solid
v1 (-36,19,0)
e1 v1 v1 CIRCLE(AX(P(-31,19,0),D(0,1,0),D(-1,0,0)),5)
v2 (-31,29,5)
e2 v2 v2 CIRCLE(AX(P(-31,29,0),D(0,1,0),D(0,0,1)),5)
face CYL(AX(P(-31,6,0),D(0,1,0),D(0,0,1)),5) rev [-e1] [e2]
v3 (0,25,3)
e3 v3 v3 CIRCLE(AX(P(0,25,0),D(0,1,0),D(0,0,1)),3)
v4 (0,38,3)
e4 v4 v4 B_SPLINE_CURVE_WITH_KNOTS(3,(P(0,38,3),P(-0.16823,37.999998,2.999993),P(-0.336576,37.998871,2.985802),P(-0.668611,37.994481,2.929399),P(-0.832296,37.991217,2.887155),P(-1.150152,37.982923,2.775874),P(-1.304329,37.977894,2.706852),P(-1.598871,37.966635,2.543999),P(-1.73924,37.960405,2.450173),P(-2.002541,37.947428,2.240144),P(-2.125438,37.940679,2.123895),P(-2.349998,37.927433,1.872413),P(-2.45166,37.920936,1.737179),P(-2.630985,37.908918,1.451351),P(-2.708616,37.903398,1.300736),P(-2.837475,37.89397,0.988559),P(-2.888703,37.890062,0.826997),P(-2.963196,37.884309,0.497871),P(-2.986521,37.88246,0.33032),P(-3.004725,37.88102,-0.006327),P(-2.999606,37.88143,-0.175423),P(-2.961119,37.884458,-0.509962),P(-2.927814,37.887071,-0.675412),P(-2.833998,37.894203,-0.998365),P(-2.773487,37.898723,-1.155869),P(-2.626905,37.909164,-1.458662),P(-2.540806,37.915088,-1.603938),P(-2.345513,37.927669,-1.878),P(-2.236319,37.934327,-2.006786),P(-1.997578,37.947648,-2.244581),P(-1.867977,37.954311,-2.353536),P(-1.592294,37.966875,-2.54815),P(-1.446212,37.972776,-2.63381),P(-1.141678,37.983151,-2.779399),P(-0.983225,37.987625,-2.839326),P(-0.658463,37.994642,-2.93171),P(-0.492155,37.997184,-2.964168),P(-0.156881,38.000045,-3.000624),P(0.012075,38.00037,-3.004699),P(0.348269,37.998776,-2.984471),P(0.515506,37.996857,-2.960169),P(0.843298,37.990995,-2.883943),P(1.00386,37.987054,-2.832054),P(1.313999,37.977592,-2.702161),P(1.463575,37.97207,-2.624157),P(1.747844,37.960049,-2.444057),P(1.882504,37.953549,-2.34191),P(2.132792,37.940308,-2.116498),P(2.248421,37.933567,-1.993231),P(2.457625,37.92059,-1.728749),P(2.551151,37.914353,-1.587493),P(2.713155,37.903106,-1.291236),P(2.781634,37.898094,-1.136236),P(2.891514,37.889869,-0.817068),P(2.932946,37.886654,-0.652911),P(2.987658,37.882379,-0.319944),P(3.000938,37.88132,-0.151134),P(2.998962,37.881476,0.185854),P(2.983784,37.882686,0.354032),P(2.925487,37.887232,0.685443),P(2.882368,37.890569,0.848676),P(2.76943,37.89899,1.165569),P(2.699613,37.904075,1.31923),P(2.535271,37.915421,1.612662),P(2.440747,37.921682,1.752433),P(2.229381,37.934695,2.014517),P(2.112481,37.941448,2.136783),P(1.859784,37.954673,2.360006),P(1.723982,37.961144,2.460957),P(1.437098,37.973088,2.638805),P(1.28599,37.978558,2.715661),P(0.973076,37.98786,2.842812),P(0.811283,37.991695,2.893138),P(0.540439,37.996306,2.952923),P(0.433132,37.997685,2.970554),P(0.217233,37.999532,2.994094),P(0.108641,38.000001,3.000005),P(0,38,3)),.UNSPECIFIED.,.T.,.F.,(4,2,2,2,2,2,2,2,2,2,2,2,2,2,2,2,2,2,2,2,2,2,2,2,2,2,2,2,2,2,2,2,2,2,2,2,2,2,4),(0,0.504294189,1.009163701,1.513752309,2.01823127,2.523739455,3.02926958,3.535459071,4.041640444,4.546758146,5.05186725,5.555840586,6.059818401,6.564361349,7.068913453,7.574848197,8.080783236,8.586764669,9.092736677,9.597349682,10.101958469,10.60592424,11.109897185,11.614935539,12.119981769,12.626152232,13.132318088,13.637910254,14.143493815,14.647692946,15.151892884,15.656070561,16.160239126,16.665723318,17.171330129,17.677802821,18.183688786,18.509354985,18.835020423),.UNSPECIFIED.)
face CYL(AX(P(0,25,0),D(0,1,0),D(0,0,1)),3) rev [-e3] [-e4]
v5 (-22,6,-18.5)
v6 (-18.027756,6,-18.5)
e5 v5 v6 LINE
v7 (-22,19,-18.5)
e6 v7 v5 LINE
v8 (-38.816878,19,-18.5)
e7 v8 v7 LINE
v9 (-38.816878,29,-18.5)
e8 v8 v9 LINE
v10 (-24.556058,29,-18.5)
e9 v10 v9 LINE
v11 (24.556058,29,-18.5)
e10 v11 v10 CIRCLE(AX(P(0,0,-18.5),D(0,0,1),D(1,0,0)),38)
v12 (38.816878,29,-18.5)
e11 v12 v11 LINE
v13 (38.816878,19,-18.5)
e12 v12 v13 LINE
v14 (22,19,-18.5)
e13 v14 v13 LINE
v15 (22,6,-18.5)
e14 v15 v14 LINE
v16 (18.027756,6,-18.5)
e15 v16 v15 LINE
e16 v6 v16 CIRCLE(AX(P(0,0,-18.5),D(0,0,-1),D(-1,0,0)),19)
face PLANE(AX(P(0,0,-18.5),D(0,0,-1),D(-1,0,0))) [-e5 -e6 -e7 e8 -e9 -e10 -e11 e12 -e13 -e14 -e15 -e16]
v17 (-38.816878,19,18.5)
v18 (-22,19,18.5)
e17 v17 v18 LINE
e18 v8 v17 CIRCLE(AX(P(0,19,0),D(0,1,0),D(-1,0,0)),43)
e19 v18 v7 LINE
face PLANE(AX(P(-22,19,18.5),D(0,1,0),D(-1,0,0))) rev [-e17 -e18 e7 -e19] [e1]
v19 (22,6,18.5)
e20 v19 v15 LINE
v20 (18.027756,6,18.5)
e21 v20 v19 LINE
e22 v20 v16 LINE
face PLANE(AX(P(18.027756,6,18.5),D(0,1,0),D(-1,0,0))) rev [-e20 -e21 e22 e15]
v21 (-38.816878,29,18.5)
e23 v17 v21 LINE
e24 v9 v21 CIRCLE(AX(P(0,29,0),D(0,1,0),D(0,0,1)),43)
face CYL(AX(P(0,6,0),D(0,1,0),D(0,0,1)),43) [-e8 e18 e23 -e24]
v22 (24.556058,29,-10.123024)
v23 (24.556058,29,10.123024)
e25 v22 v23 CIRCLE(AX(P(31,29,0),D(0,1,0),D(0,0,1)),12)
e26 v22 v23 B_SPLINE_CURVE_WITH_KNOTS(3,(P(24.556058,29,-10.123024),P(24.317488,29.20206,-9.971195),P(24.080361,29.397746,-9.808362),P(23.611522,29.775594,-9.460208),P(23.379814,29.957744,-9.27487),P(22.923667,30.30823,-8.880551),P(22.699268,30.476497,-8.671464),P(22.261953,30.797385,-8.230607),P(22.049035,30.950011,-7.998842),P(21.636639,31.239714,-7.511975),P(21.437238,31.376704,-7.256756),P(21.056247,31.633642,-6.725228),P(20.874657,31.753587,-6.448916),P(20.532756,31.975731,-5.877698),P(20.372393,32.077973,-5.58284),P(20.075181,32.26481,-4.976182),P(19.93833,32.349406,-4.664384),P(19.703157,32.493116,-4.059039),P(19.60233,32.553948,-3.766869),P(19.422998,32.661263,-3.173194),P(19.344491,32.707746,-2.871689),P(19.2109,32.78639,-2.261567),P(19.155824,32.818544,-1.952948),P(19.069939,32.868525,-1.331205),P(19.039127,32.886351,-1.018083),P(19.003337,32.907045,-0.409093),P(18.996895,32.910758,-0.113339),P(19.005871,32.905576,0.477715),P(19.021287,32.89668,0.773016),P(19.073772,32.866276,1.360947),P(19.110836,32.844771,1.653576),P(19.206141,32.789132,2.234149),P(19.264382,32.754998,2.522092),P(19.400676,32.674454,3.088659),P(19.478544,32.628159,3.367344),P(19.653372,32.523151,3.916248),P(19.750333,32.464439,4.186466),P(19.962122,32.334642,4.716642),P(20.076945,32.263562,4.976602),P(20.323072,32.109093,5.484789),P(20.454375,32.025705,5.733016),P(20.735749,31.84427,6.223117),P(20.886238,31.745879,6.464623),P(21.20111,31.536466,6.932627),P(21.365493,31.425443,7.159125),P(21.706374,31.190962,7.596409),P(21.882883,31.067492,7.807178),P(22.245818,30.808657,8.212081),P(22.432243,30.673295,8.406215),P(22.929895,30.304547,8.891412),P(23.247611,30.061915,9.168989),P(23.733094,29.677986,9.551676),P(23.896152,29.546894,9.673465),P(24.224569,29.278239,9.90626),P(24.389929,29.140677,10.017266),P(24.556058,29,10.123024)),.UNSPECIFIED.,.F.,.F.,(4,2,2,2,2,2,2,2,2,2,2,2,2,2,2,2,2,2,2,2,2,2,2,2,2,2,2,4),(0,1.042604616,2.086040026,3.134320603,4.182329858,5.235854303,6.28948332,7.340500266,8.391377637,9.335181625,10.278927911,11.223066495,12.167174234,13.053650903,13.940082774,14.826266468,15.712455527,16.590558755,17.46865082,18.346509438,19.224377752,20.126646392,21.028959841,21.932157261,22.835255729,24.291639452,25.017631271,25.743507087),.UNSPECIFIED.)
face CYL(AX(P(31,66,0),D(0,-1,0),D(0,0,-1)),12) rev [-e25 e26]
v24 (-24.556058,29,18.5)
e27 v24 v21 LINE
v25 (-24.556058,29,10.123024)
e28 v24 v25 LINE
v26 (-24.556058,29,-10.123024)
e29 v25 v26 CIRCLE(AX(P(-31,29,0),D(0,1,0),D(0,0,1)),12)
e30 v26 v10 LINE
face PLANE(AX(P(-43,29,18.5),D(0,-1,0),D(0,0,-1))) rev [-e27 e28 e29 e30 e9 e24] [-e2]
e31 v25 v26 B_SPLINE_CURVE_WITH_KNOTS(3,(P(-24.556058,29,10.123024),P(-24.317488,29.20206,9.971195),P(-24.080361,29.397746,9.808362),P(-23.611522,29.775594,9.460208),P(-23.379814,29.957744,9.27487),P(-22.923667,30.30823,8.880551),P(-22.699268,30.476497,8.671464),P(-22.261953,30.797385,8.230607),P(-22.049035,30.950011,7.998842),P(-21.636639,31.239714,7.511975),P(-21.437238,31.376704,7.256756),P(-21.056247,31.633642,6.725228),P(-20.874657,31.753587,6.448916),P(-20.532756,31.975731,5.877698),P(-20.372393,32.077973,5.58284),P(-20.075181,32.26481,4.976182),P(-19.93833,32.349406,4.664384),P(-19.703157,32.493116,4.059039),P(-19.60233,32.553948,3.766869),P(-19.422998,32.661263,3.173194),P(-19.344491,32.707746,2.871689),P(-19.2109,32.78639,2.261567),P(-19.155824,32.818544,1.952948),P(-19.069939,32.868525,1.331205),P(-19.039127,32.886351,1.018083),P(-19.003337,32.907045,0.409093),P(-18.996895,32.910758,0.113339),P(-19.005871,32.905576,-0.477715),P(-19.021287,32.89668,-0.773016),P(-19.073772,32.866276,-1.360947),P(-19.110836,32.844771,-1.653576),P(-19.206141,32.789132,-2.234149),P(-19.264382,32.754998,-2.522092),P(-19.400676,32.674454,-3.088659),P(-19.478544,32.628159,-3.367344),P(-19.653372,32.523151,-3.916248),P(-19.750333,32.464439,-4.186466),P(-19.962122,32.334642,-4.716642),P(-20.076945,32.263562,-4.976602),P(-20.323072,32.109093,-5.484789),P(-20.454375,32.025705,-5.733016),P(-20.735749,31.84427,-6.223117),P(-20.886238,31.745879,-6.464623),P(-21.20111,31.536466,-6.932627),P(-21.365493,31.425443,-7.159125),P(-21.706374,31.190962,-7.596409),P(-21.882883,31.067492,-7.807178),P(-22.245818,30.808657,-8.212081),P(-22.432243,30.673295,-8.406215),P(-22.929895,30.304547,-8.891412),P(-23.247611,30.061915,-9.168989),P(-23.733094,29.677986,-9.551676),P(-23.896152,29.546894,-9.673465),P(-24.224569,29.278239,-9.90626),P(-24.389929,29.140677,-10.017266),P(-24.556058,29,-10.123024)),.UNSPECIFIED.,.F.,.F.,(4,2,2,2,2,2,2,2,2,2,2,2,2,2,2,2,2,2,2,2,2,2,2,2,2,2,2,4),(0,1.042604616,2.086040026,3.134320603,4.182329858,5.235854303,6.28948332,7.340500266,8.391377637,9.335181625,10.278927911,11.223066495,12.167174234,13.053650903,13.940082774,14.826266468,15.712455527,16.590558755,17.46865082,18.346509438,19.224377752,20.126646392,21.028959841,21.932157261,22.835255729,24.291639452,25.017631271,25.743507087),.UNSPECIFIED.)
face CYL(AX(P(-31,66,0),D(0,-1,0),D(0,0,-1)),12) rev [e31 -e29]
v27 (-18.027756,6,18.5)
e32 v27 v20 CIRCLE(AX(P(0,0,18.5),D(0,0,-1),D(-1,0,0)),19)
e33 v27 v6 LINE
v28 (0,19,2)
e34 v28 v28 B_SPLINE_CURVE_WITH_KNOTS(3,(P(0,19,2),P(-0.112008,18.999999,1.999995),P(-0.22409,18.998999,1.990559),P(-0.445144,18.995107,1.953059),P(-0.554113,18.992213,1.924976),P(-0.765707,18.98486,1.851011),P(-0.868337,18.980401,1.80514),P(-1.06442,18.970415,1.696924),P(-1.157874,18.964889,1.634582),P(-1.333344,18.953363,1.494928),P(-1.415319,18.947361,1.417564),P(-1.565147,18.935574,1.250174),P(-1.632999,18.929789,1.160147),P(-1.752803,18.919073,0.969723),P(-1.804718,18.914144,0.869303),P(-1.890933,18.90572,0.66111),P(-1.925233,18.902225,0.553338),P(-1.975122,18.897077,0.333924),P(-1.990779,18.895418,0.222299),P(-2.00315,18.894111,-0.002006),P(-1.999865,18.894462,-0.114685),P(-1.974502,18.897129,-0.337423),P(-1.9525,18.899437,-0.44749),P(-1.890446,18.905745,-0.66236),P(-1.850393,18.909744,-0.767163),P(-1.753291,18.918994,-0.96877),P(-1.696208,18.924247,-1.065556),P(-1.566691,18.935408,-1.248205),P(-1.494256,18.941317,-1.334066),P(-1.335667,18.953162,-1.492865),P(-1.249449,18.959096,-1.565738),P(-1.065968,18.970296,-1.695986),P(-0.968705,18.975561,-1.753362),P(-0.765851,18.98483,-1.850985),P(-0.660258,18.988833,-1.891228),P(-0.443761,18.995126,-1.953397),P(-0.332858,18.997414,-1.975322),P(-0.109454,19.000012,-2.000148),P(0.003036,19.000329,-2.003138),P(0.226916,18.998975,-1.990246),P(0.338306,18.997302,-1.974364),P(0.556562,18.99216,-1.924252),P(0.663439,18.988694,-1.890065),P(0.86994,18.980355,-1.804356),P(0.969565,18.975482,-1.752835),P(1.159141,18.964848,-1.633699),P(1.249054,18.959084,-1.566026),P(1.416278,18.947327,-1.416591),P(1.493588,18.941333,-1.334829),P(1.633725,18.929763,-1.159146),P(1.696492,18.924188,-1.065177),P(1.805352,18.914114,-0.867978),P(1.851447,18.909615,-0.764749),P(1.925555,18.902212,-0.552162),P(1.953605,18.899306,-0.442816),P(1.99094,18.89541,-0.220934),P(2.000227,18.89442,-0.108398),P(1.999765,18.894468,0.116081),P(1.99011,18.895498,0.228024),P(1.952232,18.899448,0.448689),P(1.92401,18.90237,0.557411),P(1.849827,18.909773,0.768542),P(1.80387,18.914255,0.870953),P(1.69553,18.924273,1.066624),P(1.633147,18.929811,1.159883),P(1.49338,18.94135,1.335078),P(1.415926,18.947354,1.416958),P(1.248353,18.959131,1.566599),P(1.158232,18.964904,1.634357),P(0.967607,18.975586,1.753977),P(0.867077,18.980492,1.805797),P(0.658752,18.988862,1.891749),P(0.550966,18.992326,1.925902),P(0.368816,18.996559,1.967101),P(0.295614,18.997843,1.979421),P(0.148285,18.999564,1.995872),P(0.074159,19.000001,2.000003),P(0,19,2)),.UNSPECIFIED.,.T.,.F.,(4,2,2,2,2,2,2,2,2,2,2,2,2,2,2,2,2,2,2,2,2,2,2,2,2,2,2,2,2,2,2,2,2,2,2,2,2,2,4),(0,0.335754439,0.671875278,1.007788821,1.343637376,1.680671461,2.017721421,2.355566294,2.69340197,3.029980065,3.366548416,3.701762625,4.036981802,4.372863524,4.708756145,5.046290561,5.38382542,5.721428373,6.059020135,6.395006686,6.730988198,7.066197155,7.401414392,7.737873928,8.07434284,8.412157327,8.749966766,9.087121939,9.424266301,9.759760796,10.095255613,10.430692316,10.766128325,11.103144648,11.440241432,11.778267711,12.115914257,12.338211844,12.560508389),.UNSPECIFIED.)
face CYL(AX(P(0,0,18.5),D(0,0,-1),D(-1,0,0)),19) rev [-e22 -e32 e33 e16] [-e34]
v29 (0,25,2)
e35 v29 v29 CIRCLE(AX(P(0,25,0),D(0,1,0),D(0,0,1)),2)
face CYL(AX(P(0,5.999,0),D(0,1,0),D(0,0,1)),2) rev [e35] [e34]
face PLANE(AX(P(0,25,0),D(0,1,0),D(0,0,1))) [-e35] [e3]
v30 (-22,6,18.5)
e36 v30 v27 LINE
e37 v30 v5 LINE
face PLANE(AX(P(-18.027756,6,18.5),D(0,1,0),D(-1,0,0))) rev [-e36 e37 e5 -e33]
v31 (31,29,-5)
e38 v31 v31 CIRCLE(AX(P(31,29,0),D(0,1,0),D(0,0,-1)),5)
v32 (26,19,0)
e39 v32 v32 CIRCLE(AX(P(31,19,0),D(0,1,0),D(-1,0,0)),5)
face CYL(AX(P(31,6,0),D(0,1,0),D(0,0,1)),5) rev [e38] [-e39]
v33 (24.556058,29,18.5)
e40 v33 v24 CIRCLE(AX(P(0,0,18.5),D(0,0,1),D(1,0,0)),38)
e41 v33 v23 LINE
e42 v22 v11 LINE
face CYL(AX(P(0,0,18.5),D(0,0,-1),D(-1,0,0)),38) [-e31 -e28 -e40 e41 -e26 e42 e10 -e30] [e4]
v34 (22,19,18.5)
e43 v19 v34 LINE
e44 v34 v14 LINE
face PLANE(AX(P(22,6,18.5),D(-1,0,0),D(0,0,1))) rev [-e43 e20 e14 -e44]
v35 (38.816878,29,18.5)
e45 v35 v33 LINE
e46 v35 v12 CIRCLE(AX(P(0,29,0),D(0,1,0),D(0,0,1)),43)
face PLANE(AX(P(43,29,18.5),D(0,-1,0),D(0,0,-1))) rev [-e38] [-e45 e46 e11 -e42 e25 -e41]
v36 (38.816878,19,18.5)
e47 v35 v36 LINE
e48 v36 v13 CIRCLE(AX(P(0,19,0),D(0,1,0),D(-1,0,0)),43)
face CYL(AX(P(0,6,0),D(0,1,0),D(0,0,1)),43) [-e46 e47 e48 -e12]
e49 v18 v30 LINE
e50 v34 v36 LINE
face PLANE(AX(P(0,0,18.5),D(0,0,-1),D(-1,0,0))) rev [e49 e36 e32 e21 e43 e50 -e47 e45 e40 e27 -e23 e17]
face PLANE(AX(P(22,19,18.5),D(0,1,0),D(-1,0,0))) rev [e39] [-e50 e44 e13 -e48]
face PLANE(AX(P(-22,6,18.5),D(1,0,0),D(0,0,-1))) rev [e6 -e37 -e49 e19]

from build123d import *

# Parameters (mm, degrees)
BOSS_EXTRUDE1_DEPTH     = 18.5
CUT_EXTRUDE3_START      = -10
CUT_EXTRUDE3_DEPTH      = 10
SKETCH4_R               = 5
CUT_EXTRUDE4_DEPTH      = 53.156015952
SKETCH5_R               = 12
CUT_EXTRUDE5_DEPTH      = 37
SKETCH6_R               = 3
CUT_EXTRUDE6_DEPTH      = 13
CUT_EXTRUDE7_REACH      = 52.52
CUT_EXTRUDE7_END_RADIUS = 19
SKETCH7_R               = 2


# Read off the part's stored shape, not the designer's step: Cut-Extrude3
with BuildPart() as part:
    # Sketch2 → Boss-Extrude1 (new, symmetric)
    with BuildSketch(Plane.XY):
        with BuildLine():
            Line((-18.027756377, 6), (-22, 6))
            Line((-22, 6), (-22, 19))
            Line((-22, 19), (-43, 19))
            Line((-43, 19), (-43, 29))
            Line((-43, 29), (-24.556058316, 29))
            ThreePointArc((-24.556058316, 29), (0, 38), (24.556058316, 29))
            Line((24.556058316, 29), (43, 29))
            Line((43, 29), (43, 19))
            Line((43, 19), (22, 19))
            Line((22, 19), (22, 6))
            Line((22, 6), (18.027756377, 6))
            ThreePointArc((18.027756377, 6), (0, 19), (-18.027756377, 6))
        make_face()
    extrude(amount=BOSS_EXTRUDE1_DEPTH, both=True)

    # Cut-Extrude3 outline → Cut-Extrude3 (cut)
    with BuildSketch(Plane(origin=(0, 29, 0), x_dir=(1, 0, 0), z_dir=(0, 1, 0)).offset(CUT_EXTRUDE3_START)):
        with BuildLine():
            ThreePointArc((43, 0), (41.941183485, -9.483518751), (38.816877772, -18.5))
            Line((38.816877772, -18.5), (43, -18.5))
            Line((43, -18.5), (43, 0))
        make_face()
        with BuildLine():
            ThreePointArc((38.816877772, 18.5), (41.941183485, 9.483518751), (43, 0))
            Line((43, 0), (43, 18.5))
            Line((43, 18.5), (38.816877772, 18.5))
        make_face()
        with BuildLine():
            Line((-43, -18.5), (-38.816877772, -18.5))
            ThreePointArc((-38.816877772, -18.5), (-41.941183485, -9.483518751), (-43, 0))
            Line((-43, 0), (-43, -18.5))
        make_face()
        with BuildLine():
            Line((-43, 18.5), (-43, 0))
            ThreePointArc((-43, 0), (-41.941183485, 9.483518751), (-38.816877772, 18.5))
            Line((-38.816877772, 18.5), (-43, 18.5))
        make_face()
    extrude(amount=CUT_EXTRUDE3_DEPTH, mode=Mode.SUBTRACT)

    # Sketch4 → Cut-Extrude4 (cut, through all)
    with BuildSketch(Plane(origin=(0, 29, 0), x_dir=(1, 0, 0), z_dir=(0, 1, 0))):
        with Locations(Location((-31, 0, 0), (0, 0, 270))):
            Circle(SKETCH4_R)
        with Locations(Location((31, 0, 0), (0, 0, 180))):
            Circle(SKETCH4_R)
    extrude(amount=-CUT_EXTRUDE4_DEPTH, mode=Mode.SUBTRACT)

    # Sketch5 → Cut-Extrude5 (cut)
    with BuildSketch(Plane(origin=(0, 29, 0), x_dir=(1, 0, 0), z_dir=(0, 1, 0))):
        with Locations((-31, 0)):
            Circle(SKETCH5_R)
        with Locations((31, 0)):
            Circle(SKETCH5_R)
    extrude(amount=CUT_EXTRUDE5_DEPTH, mode=Mode.SUBTRACT)

    # Sketch6 → Cut-Extrude6 (cut)
    with BuildSketch(Plane(origin=(0, 38, 0), x_dir=(1, 0, 0), z_dir=(0, 1, 0))):
        with Locations(Location((0, 0, 0), (0, 0, 270))):
            Circle(SKETCH6_R)
    extrude(amount=-CUT_EXTRUDE6_DEPTH, mode=Mode.SUBTRACT)

    # Cut-Extrude7: up to this cylinder (the profile starts outside it)
    cut_extrude7_end = Plane(origin=(0, 0, 0), z_dir=(0, 0, -1)) * Cylinder(CUT_EXTRUDE7_END_RADIUS, 144.04, mode=Mode.PRIVATE)
    # Sketch7 → Cut-Extrude7 (cut, up to the surface)
    with BuildSketch(Plane(origin=(0, 25, 0), x_dir=(1, 0, 0), z_dir=(0, 1, 0)), mode=Mode.PRIVATE) as cut_extrude7_sk1:
        with Locations(Location((0, 0, 0), (0, 0, 270))):
            Circle(SKETCH7_R)
    cut_extrude7_tool1 = extrude(cut_extrude7_sk1.sketch, amount=-CUT_EXTRUDE7_REACH, mode=Mode.PRIVATE) - cut_extrude7_end
    add(cut_extrude7_tool1.solids().sort_by_distance((0, 25, 0))[0], mode=Mode.SUBTRACT)


solid = part.part
